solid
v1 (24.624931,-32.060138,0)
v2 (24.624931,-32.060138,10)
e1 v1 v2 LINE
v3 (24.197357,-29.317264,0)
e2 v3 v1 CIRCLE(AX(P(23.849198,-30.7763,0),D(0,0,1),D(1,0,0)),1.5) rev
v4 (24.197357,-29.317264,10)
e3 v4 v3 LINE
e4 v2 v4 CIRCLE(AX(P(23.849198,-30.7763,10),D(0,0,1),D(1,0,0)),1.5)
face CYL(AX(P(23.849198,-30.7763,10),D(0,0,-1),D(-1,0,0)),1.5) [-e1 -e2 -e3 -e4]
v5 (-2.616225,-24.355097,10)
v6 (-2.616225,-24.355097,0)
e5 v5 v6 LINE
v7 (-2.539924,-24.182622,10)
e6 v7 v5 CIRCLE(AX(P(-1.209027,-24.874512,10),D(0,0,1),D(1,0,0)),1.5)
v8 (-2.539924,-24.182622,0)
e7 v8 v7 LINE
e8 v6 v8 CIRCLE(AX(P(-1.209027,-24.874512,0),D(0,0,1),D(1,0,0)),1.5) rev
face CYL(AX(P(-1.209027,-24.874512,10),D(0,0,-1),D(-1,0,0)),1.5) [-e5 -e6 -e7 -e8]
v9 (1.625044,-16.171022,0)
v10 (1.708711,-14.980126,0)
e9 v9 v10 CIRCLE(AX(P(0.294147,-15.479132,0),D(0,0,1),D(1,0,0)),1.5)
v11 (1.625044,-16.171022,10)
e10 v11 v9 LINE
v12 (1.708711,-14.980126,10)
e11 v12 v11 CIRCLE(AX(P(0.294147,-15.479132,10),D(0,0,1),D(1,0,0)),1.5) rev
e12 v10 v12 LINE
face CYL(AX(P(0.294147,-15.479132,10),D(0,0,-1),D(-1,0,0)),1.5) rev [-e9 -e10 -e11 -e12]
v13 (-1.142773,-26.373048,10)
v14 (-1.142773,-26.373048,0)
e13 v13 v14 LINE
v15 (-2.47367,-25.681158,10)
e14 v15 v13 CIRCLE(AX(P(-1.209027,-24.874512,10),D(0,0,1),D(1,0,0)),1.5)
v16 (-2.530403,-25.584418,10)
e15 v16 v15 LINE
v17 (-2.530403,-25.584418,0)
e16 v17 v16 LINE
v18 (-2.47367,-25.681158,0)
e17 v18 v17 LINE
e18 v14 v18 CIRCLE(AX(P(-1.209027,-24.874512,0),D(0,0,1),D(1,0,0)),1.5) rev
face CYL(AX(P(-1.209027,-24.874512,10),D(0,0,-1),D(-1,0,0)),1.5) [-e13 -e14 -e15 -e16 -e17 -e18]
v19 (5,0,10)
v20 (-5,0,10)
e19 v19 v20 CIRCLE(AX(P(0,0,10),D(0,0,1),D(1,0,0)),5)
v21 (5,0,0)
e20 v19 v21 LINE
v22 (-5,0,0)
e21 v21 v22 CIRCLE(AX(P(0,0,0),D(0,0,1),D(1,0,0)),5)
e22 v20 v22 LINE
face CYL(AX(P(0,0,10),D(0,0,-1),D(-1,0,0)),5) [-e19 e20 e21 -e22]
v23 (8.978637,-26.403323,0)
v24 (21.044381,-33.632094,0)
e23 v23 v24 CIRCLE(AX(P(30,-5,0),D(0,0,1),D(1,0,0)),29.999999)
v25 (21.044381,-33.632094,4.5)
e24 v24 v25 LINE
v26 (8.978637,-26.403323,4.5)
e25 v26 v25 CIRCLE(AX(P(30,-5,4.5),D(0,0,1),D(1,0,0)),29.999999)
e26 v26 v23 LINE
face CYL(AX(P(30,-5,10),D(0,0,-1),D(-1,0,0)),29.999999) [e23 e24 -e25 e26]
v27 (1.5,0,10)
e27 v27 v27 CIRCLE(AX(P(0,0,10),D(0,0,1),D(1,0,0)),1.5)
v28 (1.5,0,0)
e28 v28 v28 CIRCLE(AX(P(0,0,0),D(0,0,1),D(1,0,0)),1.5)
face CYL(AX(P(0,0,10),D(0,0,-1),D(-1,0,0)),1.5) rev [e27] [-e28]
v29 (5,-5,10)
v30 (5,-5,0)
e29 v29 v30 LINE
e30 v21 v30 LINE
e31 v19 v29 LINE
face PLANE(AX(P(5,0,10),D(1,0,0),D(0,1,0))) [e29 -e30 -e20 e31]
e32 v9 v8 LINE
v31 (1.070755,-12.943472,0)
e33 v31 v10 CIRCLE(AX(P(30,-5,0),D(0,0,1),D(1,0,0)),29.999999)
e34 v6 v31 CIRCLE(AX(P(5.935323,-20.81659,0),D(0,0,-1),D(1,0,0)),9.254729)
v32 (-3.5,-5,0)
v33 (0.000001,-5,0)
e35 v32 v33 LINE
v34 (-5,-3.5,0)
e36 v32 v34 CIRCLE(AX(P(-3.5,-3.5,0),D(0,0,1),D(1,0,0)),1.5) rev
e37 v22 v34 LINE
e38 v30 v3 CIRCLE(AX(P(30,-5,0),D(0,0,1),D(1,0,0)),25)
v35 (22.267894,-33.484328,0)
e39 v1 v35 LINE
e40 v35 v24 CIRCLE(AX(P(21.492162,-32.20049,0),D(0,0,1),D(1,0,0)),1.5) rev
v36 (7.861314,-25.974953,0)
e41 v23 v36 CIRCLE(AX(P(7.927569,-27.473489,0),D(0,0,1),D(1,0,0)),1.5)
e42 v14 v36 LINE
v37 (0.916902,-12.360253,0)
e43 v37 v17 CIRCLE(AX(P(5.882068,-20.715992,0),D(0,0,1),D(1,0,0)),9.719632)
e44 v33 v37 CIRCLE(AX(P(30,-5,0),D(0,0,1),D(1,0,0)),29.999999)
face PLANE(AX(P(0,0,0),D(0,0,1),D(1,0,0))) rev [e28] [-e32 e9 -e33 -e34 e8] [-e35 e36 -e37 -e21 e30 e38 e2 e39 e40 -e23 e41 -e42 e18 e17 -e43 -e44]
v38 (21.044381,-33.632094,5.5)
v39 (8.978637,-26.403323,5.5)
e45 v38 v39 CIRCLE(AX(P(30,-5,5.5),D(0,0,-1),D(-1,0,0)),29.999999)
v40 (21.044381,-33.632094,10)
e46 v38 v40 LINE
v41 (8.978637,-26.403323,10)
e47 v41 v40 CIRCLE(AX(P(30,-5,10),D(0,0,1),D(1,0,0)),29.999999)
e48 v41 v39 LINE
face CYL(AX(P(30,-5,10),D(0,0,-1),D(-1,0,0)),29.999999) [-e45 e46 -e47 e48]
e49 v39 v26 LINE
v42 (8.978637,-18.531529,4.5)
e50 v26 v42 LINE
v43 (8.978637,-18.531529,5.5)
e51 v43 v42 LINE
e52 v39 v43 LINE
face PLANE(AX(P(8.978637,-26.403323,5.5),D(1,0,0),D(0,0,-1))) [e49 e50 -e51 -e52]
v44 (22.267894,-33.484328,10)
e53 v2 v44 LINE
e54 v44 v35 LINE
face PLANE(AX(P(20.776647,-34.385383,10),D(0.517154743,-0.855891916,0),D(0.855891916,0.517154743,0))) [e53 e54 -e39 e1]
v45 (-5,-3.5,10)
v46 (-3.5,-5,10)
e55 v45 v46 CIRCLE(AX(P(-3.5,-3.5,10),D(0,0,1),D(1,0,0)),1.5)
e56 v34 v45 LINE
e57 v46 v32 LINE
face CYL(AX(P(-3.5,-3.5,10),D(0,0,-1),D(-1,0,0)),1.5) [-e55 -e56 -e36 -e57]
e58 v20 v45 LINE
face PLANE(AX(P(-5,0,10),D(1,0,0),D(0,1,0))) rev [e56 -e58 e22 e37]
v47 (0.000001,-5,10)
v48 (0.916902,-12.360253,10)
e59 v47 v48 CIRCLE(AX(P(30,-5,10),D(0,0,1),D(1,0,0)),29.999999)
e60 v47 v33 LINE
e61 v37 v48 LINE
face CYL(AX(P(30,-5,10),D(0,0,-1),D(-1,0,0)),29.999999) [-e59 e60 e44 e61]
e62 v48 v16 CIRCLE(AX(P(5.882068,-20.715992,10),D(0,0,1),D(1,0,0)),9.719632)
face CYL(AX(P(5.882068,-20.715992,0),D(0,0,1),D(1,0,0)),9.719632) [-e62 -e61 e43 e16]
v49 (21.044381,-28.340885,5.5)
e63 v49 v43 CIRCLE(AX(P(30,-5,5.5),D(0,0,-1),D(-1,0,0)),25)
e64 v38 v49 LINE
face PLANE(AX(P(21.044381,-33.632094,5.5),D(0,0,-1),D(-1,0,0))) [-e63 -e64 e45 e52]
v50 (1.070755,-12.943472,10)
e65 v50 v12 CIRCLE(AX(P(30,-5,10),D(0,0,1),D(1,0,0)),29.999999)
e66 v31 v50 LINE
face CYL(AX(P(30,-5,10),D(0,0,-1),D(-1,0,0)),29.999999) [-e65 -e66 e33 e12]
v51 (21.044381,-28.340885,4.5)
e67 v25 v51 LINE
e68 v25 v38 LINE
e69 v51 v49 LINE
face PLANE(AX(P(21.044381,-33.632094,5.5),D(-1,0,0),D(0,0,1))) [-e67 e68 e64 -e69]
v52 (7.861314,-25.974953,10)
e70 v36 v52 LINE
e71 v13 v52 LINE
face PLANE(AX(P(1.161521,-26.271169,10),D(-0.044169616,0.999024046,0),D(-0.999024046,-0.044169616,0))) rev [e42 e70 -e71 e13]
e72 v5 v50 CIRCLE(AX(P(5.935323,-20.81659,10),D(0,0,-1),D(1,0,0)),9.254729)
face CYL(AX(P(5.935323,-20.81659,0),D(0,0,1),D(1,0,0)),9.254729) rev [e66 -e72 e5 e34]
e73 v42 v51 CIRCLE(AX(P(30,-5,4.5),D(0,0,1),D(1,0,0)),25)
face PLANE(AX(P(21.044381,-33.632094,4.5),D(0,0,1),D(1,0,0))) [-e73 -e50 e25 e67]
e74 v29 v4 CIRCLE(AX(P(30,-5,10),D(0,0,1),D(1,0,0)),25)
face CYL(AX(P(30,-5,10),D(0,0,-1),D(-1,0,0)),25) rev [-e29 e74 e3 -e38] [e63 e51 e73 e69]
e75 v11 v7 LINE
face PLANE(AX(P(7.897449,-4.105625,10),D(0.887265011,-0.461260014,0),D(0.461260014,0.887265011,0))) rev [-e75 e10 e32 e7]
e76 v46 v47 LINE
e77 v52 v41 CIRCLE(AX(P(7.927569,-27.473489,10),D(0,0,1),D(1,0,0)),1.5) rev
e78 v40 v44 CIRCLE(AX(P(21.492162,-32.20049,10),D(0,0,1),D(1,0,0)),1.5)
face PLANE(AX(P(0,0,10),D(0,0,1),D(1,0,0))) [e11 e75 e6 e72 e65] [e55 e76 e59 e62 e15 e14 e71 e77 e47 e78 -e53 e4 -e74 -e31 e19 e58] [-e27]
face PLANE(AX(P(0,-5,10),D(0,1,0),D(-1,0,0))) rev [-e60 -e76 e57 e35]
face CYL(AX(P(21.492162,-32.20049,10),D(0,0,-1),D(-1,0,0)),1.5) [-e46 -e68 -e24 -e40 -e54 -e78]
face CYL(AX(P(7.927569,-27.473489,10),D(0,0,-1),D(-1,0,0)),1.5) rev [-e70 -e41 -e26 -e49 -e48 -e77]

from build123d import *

# Parameters (mm, degrees)
SKETCH_2_R              = 1.5
EXTRUDE_1_DEPTH         = 10
FILLET_1_R              = 1.5
CUT_EXTRUDE_START       = 8.978636738
CUT_EXTRUDE_6_OUTLINE_W = 18
CUT_EXTRUDE_6_OUTLINE_H = 1
CUT_EXTRUDE_6_DEPTH     = 12.065744551
EXTRUDE_START           = -10
EXTRUDE_2_DEPTH         = 10


# Read off the part's stored shape, not the designer's step: 切除-拉伸6
with BuildPart() as part:
    # 草图2 → 凸台-拉伸1 (new body)
    with BuildSketch(Plane.XY):
        with BuildLine():
            Line((-3.738313135, -26.487804482), (8.522639585, -25.945713856))
            ThreePointArc((8.522639585, -25.945713856), (14.597644225, -30.744268797), (21.698305683, -33.828489568))
            Line((21.698305683, -33.828489568), (28.148131868, -29.931317342))
            ThreePointArc((28.148131868, -29.931317342), (11.679291726, -22.010339454), (5, -5))
            Line((5, -5), (5, 0))
            ThreePointArc((5, 0), (0, 5), (-5, 0))
            Line((-5, 0), (-5, -5))
            Line((-5, -5), (1.011e-06, -5))
            ThreePointArc((1.011e-06, -5), (0.486326168, -10.379869542), (1.929534162, -15.585314685))
            Line((1.929534162, -15.585314685), (-3.738313135, -26.487804482))
        make_face()
        Circle(SKETCH_2_R, mode=Mode.SUBTRACT)
    extrude(amount=EXTRUDE_1_DEPTH)

    # 圆角1
    fillet_1_edges = [part.edges().sort_by_distance(p)[0] for p in [
        (-3.738313135, -26.487804482, 5),
        (1.929534162, -15.585314685, 5),
        (-5, -5, 5),
        (28.148131868, -29.931317342, 5),
        (21.698305683, -33.828489568, 5),
        (8.522639585, -25.945713856, 5),
    ]]
    fillet(fillet_1_edges, radius=FILLET_1_R)

    # 切除-拉伸6 outline → 切除-拉伸6 (cut)
    with BuildSketch(Plane.YZ.offset(CUT_EXTRUDE_START)):
        with Locations((-26, 5)):
            Rectangle(CUT_EXTRUDE_6_OUTLINE_W, CUT_EXTRUDE_6_OUTLINE_H)
    extrude(amount=CUT_EXTRUDE_6_DEPTH, mode=Mode.SUBTRACT)

    # 草图3 → 凸台-拉伸2 (add)
    with BuildSketch(Plane.XY.offset(10).offset(EXTRUDE_START)):
        with BuildLine():
            Line((-2.473670042, -25.681158433), (-1.937795126, -25.681158433))
            ThreePointArc((-1.937795126, -25.681158433), (-3.071581107, -18.689223974), (1.070755407, -12.943471949))
            ThreePointArc((1.070755407, -12.943471949), (0.992362696, -12.652249172), (0.916901566, -12.360253041))
            ThreePointArc((0.916901566, -12.360253041), (-3.537234076, -18.318495365), (-2.473670042, -25.681158433))
        make_face()
    extrude(amount=EXTRUDE_2_DEPTH)


solid = part.part
